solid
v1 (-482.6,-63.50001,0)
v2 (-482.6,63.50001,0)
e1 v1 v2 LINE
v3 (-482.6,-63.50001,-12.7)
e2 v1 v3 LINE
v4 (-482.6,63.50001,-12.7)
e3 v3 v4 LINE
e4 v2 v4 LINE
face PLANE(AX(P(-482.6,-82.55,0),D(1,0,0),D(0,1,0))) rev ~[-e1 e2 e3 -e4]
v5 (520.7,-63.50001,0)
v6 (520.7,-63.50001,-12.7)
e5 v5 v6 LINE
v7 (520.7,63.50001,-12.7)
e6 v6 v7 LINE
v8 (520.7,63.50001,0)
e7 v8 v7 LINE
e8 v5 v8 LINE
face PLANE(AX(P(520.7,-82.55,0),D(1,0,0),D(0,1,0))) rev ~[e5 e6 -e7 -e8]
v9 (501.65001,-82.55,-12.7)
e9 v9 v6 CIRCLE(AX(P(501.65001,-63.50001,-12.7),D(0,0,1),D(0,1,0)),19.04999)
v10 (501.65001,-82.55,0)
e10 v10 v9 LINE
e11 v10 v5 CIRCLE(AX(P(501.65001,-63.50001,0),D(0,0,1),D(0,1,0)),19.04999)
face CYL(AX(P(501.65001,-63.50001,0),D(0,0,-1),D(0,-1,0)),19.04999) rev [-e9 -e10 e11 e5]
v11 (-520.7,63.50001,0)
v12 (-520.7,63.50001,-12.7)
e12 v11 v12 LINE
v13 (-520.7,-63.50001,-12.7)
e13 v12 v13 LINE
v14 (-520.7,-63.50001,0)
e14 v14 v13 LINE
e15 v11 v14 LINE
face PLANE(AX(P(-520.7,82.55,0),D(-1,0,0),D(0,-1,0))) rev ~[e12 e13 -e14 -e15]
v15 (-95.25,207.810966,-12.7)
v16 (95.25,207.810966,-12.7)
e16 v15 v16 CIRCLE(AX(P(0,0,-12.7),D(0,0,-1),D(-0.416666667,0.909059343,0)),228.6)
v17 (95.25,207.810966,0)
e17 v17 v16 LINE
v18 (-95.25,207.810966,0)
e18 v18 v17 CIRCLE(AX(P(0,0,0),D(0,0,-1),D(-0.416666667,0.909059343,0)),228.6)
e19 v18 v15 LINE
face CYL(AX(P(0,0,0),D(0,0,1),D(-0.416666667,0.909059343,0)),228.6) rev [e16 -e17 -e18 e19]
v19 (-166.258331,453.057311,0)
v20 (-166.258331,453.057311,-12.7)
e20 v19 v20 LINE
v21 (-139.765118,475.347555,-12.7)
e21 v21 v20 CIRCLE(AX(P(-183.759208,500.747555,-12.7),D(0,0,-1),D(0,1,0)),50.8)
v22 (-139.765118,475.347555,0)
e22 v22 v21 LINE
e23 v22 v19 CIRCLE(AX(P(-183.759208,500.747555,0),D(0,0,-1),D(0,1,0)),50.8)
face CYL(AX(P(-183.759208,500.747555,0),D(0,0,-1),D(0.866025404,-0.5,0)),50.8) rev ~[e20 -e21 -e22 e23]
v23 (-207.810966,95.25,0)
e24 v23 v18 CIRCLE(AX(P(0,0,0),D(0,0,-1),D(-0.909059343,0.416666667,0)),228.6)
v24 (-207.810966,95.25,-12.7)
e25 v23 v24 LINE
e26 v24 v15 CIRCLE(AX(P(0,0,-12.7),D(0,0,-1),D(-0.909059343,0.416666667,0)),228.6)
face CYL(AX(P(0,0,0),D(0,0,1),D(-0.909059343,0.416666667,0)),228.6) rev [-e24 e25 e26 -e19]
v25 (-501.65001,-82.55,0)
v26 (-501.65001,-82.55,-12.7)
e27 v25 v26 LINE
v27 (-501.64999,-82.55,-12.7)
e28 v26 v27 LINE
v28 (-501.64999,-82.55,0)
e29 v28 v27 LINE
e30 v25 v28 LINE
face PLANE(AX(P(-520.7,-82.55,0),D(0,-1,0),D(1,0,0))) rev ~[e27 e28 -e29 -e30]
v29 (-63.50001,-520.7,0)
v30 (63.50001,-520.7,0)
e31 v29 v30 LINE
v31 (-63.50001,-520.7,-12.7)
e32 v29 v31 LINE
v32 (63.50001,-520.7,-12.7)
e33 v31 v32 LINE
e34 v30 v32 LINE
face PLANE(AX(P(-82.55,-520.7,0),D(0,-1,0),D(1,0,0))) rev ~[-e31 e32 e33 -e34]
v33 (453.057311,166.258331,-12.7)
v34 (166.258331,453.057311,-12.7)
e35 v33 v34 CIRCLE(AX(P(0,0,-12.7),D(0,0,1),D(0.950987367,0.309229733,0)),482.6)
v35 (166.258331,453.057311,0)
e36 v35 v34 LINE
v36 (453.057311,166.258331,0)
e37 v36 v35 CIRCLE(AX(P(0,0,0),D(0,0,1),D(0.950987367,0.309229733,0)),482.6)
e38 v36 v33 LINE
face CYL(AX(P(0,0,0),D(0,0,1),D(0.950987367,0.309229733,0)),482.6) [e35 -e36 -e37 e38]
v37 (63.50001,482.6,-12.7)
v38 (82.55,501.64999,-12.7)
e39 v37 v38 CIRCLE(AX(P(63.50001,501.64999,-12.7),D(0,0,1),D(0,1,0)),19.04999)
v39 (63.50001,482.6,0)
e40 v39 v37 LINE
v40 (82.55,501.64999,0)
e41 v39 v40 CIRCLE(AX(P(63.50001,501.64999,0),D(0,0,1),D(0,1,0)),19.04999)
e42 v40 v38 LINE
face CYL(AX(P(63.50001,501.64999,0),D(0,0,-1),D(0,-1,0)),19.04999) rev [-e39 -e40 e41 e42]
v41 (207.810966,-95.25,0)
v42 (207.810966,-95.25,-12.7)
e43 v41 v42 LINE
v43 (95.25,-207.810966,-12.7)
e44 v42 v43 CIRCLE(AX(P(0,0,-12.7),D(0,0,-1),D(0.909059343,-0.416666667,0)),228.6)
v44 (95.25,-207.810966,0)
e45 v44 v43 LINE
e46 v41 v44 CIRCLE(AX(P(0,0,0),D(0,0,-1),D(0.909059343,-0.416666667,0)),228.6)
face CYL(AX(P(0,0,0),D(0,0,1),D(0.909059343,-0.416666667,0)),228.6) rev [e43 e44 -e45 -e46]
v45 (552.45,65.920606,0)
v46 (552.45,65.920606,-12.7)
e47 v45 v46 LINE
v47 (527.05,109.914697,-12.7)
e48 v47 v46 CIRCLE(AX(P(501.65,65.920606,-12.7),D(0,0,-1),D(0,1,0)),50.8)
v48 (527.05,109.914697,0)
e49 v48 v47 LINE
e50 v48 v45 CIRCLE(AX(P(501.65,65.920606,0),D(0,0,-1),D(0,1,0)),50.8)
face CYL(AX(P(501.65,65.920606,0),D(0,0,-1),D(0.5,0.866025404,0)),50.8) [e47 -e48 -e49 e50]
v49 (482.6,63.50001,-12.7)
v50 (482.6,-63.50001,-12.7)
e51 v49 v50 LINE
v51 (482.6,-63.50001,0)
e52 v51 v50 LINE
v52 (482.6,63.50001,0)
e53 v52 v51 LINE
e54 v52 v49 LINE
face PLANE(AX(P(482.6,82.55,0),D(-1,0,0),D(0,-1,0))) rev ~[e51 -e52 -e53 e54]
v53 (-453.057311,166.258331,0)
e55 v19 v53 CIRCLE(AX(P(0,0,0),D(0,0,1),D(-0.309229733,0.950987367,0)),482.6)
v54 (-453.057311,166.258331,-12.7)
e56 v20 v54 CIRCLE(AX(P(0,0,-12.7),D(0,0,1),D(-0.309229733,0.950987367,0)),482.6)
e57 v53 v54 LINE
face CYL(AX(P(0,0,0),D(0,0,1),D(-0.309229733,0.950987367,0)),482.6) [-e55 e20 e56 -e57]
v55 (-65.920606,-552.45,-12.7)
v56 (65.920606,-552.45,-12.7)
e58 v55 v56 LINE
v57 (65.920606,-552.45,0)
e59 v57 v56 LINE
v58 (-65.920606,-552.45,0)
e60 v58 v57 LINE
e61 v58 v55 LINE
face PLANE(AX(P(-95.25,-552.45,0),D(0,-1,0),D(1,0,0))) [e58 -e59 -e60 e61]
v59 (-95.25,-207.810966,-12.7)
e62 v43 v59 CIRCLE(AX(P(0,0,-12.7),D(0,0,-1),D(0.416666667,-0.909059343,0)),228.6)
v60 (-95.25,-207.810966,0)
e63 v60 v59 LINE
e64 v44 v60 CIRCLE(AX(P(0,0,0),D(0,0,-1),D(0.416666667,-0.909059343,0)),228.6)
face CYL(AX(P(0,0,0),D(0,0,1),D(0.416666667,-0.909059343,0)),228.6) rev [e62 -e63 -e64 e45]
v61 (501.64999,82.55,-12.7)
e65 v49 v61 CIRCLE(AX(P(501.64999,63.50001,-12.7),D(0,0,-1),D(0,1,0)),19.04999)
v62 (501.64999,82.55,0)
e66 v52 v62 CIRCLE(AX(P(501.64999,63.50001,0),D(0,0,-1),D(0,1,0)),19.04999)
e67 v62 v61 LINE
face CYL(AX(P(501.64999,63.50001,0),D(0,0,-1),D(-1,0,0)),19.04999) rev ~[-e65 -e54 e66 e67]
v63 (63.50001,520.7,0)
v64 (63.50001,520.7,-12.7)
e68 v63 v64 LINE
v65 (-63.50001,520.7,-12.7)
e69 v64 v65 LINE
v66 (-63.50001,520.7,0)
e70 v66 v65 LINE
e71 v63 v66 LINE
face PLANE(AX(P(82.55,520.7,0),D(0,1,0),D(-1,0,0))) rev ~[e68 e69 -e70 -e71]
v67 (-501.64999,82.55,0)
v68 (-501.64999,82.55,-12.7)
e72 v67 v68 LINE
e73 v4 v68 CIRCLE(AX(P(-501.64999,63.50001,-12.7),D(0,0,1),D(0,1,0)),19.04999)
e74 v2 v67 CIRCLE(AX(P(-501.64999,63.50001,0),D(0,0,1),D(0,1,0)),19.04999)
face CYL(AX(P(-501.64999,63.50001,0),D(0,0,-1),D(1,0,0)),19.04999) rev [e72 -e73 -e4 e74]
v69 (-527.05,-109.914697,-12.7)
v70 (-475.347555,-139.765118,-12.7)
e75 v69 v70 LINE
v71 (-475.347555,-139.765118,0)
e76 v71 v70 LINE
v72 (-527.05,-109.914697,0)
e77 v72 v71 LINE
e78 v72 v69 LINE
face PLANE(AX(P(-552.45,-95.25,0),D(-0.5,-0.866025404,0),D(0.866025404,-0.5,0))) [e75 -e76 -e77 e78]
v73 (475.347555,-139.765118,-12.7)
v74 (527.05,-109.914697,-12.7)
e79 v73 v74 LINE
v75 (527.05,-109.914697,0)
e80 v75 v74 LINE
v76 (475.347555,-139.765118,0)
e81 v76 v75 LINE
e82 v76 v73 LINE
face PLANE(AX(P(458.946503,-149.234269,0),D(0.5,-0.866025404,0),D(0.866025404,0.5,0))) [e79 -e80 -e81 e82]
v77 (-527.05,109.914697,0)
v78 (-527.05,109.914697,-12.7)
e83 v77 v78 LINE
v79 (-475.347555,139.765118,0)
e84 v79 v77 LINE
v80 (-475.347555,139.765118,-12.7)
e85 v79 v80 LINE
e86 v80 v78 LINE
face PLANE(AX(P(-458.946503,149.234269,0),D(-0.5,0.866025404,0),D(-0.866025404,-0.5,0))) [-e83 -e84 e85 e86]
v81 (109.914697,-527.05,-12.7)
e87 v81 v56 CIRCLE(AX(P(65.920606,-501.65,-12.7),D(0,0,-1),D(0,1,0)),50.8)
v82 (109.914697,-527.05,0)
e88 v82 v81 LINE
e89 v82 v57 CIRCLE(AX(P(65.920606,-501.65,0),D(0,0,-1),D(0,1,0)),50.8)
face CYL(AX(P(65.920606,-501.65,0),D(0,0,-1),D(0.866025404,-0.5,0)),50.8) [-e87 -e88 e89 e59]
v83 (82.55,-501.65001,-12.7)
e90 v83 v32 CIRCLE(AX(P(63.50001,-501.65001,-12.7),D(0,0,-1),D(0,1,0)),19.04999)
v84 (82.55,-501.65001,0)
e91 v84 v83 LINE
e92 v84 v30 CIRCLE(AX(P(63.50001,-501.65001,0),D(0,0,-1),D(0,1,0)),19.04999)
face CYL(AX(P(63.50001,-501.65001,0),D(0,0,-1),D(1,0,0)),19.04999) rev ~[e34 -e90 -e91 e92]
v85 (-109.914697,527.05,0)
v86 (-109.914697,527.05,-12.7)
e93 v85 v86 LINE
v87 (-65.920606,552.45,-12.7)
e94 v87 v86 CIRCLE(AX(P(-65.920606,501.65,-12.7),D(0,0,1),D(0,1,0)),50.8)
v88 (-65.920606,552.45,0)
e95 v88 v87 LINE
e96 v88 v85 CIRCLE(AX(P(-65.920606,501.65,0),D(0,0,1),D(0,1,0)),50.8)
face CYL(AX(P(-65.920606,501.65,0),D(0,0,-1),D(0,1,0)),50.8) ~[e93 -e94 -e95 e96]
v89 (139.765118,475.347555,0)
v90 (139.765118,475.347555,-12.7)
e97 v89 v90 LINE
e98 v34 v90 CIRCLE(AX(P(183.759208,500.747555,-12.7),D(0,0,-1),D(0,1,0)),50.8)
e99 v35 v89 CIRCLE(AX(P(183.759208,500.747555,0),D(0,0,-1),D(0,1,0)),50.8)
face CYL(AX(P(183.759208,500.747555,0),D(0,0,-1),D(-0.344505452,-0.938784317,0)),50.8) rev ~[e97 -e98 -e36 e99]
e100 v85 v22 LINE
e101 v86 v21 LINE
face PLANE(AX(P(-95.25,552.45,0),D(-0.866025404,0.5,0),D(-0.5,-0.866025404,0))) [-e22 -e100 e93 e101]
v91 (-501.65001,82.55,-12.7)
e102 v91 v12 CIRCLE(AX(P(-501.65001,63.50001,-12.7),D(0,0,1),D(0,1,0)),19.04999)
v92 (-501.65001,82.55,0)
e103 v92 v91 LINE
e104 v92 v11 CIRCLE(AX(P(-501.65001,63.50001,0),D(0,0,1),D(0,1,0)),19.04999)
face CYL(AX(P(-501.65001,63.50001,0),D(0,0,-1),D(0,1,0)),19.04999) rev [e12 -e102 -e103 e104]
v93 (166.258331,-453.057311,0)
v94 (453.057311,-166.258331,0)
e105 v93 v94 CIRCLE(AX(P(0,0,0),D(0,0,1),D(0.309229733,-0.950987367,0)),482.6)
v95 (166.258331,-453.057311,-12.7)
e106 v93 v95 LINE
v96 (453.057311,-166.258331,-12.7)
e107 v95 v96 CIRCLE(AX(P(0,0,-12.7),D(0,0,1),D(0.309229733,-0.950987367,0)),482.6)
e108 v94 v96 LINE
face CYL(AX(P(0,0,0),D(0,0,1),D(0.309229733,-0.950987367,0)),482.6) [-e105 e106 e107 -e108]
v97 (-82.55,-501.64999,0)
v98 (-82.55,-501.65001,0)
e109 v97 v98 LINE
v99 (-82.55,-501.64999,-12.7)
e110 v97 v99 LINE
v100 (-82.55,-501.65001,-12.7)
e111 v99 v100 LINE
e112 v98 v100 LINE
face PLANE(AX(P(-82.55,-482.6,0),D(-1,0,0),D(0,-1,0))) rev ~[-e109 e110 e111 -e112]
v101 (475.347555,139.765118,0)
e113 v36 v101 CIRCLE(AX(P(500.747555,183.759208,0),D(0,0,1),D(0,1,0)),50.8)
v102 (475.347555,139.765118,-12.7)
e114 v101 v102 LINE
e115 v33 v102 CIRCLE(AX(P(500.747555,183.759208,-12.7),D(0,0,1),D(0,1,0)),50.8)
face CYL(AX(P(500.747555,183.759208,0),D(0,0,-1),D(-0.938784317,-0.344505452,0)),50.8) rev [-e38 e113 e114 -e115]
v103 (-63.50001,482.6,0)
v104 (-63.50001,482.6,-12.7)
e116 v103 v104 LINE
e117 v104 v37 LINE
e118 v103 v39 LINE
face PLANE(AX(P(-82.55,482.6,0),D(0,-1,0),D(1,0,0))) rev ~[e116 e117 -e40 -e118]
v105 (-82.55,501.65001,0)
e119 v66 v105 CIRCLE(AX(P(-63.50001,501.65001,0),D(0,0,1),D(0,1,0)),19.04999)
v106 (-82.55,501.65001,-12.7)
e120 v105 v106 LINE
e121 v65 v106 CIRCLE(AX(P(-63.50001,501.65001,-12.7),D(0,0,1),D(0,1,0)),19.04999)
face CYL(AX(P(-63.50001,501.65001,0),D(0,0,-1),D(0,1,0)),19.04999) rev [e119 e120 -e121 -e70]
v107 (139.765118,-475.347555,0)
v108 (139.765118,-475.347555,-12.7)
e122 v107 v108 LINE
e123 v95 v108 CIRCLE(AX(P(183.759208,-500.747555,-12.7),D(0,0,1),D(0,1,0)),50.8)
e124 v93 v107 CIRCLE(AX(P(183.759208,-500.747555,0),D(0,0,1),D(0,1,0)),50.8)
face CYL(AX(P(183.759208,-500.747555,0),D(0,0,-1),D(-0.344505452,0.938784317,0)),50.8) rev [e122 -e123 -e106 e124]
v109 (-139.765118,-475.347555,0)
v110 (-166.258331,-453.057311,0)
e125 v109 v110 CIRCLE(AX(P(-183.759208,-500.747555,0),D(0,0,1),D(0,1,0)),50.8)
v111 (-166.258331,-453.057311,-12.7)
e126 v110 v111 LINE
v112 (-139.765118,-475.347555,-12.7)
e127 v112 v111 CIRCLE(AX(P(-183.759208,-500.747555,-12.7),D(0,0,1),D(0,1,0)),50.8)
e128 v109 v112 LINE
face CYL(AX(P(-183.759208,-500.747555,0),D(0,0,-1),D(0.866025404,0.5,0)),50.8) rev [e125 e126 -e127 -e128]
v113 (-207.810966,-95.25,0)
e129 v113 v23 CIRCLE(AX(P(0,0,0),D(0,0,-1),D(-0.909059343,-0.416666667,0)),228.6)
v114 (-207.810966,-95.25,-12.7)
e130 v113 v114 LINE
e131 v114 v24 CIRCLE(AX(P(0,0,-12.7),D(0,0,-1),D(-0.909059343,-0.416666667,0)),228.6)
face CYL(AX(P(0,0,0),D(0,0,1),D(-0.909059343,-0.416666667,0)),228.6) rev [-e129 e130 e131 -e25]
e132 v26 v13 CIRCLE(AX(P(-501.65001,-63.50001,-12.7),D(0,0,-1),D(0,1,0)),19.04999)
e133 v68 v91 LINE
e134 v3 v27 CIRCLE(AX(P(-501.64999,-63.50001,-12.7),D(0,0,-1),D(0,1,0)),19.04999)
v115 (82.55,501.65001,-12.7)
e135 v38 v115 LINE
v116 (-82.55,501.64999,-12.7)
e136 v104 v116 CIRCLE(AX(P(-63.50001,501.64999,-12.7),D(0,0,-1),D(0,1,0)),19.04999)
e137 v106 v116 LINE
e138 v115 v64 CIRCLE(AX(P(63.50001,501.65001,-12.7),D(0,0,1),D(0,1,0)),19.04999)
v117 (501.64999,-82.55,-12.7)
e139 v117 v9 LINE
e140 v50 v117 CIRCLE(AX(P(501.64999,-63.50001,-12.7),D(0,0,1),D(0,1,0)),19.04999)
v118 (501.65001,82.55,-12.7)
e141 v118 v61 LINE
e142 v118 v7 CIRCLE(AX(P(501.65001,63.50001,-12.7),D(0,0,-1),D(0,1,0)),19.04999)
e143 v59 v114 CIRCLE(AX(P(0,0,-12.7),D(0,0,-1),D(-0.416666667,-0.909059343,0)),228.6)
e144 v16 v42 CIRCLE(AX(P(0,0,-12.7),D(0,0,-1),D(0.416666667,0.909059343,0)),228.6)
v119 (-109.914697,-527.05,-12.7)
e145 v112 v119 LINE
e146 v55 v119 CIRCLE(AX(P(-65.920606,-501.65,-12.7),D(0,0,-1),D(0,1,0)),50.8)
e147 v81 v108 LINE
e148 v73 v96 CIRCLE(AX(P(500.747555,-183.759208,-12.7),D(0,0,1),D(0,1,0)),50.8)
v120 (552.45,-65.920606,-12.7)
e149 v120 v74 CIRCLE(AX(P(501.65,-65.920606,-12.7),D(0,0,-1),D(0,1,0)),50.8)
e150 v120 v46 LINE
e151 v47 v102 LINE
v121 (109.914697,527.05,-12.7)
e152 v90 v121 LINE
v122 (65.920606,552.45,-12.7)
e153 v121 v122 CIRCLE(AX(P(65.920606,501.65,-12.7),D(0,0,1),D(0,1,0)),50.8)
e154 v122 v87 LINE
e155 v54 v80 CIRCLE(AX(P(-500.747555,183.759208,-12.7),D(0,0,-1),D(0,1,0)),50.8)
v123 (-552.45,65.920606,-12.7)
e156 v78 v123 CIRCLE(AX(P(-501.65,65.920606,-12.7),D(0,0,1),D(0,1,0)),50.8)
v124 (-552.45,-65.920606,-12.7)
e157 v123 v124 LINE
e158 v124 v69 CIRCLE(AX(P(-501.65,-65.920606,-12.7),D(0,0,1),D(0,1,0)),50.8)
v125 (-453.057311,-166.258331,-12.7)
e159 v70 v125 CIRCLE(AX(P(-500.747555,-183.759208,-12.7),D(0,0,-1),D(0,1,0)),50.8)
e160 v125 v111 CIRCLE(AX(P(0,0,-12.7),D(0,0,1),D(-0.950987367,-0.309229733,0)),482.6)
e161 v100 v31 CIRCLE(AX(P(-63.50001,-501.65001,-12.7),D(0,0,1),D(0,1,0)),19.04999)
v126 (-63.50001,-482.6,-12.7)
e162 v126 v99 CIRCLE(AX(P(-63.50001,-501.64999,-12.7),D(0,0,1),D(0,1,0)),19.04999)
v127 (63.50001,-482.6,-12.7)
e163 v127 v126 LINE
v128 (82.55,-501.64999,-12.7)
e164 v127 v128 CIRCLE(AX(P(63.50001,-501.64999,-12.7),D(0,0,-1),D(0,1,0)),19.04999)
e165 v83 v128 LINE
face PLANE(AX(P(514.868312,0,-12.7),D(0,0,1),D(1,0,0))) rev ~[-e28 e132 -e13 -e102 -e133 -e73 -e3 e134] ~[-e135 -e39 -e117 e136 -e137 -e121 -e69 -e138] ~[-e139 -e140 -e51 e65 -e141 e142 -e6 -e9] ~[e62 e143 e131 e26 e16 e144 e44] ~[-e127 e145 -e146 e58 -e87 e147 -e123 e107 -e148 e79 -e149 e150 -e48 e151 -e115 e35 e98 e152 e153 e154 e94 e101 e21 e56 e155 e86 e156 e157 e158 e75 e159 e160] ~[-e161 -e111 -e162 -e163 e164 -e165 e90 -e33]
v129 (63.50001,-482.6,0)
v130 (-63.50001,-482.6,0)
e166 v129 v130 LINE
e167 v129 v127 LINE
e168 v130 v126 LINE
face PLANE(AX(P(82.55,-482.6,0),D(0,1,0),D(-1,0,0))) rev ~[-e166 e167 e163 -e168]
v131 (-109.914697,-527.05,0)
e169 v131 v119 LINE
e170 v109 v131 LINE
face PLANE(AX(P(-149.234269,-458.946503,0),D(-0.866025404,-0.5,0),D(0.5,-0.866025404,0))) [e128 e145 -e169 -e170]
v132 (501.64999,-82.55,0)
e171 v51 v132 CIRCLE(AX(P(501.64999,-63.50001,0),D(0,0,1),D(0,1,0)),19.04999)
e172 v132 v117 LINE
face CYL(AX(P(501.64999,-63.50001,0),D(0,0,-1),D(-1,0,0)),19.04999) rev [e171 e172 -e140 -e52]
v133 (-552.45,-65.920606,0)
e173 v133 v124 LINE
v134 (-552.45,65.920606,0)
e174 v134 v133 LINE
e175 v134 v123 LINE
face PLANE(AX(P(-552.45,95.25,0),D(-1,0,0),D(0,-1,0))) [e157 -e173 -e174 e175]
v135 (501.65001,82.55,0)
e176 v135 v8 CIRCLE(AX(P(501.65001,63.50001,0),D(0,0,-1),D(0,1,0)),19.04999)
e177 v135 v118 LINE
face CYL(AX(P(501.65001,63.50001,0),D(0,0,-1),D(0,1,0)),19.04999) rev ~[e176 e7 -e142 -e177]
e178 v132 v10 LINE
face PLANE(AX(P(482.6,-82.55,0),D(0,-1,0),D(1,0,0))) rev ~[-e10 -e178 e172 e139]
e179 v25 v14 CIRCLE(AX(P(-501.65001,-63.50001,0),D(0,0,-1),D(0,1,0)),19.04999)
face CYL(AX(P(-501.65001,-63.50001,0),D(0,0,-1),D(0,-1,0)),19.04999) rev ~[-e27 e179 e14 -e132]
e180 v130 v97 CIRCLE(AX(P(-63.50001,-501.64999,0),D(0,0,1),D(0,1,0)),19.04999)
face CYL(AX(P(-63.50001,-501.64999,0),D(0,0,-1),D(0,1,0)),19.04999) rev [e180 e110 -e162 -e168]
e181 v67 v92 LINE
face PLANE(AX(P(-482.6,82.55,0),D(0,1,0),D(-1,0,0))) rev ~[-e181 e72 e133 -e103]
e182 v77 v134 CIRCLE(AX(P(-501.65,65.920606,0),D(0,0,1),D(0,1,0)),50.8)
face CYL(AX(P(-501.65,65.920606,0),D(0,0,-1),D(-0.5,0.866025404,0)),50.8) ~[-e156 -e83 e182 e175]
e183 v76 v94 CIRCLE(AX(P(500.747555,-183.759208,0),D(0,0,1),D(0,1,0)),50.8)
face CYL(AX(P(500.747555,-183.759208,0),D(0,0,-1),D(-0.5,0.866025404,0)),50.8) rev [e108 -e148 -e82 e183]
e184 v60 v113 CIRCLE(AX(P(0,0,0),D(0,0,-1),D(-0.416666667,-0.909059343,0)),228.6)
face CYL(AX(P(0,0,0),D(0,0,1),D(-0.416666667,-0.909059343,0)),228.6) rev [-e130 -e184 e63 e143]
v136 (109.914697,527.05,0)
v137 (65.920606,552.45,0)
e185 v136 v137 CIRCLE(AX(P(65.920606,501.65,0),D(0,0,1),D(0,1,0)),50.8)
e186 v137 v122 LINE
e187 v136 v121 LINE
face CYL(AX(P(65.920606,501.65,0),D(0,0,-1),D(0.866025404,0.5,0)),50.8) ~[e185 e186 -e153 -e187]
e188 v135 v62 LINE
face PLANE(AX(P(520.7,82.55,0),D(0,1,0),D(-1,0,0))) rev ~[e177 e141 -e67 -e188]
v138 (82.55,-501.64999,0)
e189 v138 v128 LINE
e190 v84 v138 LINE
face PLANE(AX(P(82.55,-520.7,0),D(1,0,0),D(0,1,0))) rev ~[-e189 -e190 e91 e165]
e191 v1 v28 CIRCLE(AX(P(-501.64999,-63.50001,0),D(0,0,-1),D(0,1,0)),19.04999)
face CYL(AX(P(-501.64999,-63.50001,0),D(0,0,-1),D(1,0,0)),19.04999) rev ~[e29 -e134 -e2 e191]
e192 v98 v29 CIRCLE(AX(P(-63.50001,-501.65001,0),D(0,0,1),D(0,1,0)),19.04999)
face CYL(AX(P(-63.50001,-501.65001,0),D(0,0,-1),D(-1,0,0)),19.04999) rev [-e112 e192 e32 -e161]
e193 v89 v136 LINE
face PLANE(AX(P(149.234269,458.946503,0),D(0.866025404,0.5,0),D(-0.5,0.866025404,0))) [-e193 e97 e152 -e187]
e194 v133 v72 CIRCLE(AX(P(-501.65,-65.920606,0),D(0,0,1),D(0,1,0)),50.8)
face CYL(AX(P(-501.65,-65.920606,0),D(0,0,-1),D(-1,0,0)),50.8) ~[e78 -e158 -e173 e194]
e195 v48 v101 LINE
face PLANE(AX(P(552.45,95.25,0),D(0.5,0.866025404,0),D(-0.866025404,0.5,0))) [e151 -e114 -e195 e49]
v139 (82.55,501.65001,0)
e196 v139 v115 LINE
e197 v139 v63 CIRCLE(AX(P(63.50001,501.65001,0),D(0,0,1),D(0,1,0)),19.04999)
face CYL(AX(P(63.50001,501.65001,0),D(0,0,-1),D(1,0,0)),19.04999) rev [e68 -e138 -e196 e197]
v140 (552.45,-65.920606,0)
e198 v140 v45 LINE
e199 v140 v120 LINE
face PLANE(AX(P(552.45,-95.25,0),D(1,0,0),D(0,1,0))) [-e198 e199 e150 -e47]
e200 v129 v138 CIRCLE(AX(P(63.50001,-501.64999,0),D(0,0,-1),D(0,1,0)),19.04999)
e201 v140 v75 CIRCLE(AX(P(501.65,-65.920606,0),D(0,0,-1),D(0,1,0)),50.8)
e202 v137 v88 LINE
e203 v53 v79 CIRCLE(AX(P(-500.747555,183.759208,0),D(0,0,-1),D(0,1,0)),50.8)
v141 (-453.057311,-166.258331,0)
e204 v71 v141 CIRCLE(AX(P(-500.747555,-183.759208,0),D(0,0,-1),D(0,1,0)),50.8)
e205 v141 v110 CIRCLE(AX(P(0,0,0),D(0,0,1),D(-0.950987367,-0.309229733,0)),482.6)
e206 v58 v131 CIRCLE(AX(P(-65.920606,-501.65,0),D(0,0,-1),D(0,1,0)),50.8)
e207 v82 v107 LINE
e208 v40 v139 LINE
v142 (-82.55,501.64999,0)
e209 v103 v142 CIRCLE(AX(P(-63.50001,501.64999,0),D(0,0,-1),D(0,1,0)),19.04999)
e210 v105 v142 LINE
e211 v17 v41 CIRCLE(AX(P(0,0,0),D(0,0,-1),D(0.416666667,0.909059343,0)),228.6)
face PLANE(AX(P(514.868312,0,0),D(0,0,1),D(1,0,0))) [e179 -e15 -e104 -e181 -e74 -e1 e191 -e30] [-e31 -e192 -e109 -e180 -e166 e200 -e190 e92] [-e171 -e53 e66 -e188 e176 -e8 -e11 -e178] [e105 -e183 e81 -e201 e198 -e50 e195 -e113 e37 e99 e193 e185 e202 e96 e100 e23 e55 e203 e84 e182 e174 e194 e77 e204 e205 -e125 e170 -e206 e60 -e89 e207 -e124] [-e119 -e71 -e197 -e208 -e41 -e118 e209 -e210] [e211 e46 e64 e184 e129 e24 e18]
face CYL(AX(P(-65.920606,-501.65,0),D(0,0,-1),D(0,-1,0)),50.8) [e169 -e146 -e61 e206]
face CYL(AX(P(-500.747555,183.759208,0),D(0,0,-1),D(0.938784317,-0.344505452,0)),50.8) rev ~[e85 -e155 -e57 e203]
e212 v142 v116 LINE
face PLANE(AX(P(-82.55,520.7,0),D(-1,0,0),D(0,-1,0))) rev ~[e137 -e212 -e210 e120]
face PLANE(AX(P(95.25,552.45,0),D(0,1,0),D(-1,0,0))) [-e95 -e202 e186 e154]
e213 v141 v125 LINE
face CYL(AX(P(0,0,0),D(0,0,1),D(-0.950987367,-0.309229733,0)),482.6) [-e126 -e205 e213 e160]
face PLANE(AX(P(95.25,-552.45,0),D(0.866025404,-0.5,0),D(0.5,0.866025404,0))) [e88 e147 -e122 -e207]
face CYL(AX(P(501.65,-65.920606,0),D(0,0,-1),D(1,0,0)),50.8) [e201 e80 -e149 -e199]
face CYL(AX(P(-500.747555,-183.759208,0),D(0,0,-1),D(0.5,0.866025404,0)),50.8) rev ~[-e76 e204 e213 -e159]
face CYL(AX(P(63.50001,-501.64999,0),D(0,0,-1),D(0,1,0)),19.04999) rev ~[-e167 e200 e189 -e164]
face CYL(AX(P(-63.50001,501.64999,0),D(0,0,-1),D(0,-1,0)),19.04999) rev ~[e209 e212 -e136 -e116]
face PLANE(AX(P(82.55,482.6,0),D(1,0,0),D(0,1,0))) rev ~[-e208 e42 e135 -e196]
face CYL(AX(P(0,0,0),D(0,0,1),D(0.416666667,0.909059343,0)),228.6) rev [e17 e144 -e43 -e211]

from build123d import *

# Parameters (mm, degrees)
F1_DEPTH        = 12.7
F2_DEPTH        = 25.4
F2_COPIES_COUNT = 4
F3_R            = 19.04999
F5_R            = 50.8


# Not quite as in the source:
# - a fillet or chamfer is up to 0.001 mm smaller than in the source, because OpenCascade refuses the exact size
# - a feature of the source that left no trace in its solid (it failed there, or was rolled back) is left out
# - a pattern or mirror of a feature is missing from the dataset's text; its kind, count and spacing are read off the source's solid


with BuildPart() as f1:
    # F0 (on Top) → F1 (new body)
    with BuildSketch(Plane.XY):
        with BuildLine():
            Line((552.45, 95.25), (473.1069620075, 95.25))
            ThreePointArc((473.1069620075, 95.25), (480.2208761939, 47.8609451179), (482.6, 0))
            ThreePointArc((482.6, 0), (480.2208761939, -47.8609451179), (473.1069620075, -95.25))
            Line((473.1069620075, -95.25), (552.45, -95.25))
            Line((552.45, -95.25), (552.45, 95.25))
        make_face()
        with BuildLine():
            Line((-207.8109657838, 95.25), (-473.1069620075, 95.25))
            ThreePointArc((-473.1069620075, 95.25), (-480.2208762804, 47.8609442495), (-482.6, -1.7456e-06))
            ThreePointArc((-482.6, -1.7456e-06), (-480.2208761073, -47.8609459864), (-473.1069620075, -95.25))
            Line((-473.1069620075, -95.25), (-207.8109657838, -95.25))
            ThreePointArc((-207.8109657838, -95.25), (-228.6, 0), (-207.8109657838, 95.25))
        make_face()
        with BuildLine():
            Line((473.1069620075, 95.25), (207.8109657838, 95.25))
            ThreePointArc((207.8109657838, 95.25), (223.3422785527, 48.7461445748), (228.6, 0))
            ThreePointArc((228.6, 0), (223.3422785527, -48.7461445748), (207.8109657838, -95.25))
            Line((207.8109657838, -95.25), (473.1069620075, -95.25))
            ThreePointArc((473.1069620075, -95.25), (480.2208761939, -47.8609451179), (482.6, 0))
            ThreePointArc((482.6, 0), (480.2208761939, 47.8609451179), (473.1069620075, 95.25))
        make_face()
        with BuildLine():
            ThreePointArc((-458.9465033909, 149.2342689375), (-466.8077665522, 122.4470052167), (-473.1069620075, 95.25))
            Line((-473.1069620075, 95.25), (-207.8109657838, 95.25))
            ThreePointArc((-207.8109657838, 95.25), (-161.6446101792, 161.6446101792), (-95.25, 207.8109657838))
            Line((-95.25, 207.8109657838), (-95.25, 473.1069620075))
            ThreePointArc((-95.25, 473.1069620075), (-122.4470052167, 466.8077665522), (-149.2342689375, 458.9465033909))
            ThreePointArc((-149.2342689375, 458.9465033909), (-341.2497326006, 341.2497326006), (-458.9465033909, 149.2342689375))
        make_face()
        with BuildLine():
            Line((-95.25, 473.1069620075), (-95.25, 207.8109657838))
            ThreePointArc((-95.25, 207.8109657838), (0, 228.6), (95.25, 207.8109657838))
            Line((95.25, 207.8109657838), (95.25, 473.1069620075))
            ThreePointArc((95.25, 473.1069620075), (0, 482.6), (-95.25, 473.1069620075))
        make_face()
        with BuildLine():
            Line((95.25, 473.1069620075), (95.25, 207.8109657838))
            ThreePointArc((95.25, 207.8109657838), (161.6446101792, 161.6446101792), (207.8109657838, 95.25))
            Line((207.8109657838, 95.25), (473.1069620075, 95.25))
            ThreePointArc((473.1069620075, 95.25), (466.8077665522, 122.4470052167), (458.9465033909, 149.2342689375))
            ThreePointArc((458.9465033909, 149.2342689375), (341.2497326006, 341.2497326006), (149.2342689375, 458.9465033909))
            ThreePointArc((149.2342689375, 458.9465033909), (122.4470052167, 466.8077665522), (95.25, 473.1069620075))
        make_face()
        with BuildLine():
            Line((-95.25, 552.45), (-95.25, 473.1069620075))
            ThreePointArc((-95.25, 473.1069620075), (0, 482.6), (95.25, 473.1069620075))
            Line((95.25, 473.1069620075), (95.25, 552.45))
            Line((95.25, 552.45), (-95.25, 552.45))
        make_face()
        with BuildLine():
            ThreePointArc((207.8109657838, -95.25), (161.6446101792, -161.6446101792), (95.25, -207.8109657838))
            Line((95.25, -207.8109657838), (95.25, -473.1069620075))
            ThreePointArc((95.25, -473.1069620075), (122.4470052167, -466.8077665522), (149.2342689375, -458.9465033909))
            ThreePointArc((149.2342689375, -458.9465033909), (341.2497326006, -341.2497326006), (458.9465033909, -149.2342689375))
            ThreePointArc((458.9465033909, -149.2342689375), (466.8077665522, -122.4470052167), (473.1069620075, -95.25))
            Line((473.1069620075, -95.25), (207.8109657838, -95.25))
        make_face()
        with BuildLine():
            ThreePointArc((95.25, -207.8109657838), (0, -228.6), (-95.25, -207.8109657838))
            Line((-95.25, -207.8109657838), (-95.25, -473.1069620075))
            ThreePointArc((-95.25, -473.1069620075), (0, -482.6), (95.25, -473.1069620075))
            Line((95.25, -473.1069620075), (95.25, -207.8109657838))
        make_face()
        with BuildLine():
            Line((-207.8109657838, -95.25), (-473.1069620075, -95.25))
            ThreePointArc((-473.1069620075, -95.25), (-466.8077665522, -122.4470052167), (-458.9465033909, -149.2342689375))
            ThreePointArc((-458.9465033909, -149.2342689375), (-341.2497326006, -341.2497326006), (-149.2342689375, -458.9465033909))
            ThreePointArc((-149.2342689375, -458.9465033909), (-122.4470052167, -466.8077665522), (-95.25, -473.1069620075))
            Line((-95.25, -473.1069620075), (-95.25, -207.8109657838))
            ThreePointArc((-95.25, -207.8109657838), (-161.6446101792, -161.6446101792), (-207.8109657838, -95.25))
        make_face()
        with BuildLine():
            ThreePointArc((95.25, -473.1069620075), (0, -482.6), (-95.25, -473.1069620075))
            Line((-95.25, -473.1069620075), (-95.25, -552.45))
            Line((-95.25, -552.45), (95.25, -552.45))
            Line((95.25, -552.45), (95.25, -473.1069620075))
        make_face()
        with BuildLine():
            Line((-473.1069620075, 95.25), (-552.45, 95.25))
            Line((-552.45, 95.25), (-552.45, -95.25))
            Line((-552.45, -95.25), (-473.1069620075, -95.25))
            ThreePointArc((-473.1069620075, -95.25), (-480.2208761073, -47.8609459864), (-482.6, -1.7456e-06))
            ThreePointArc((-482.6, -1.7456e-06), (-480.2208762804, 47.8609442495), (-473.1069620075, 95.25))
        make_face()
        Polygon((-482.6, 82.55), (-482.6, -1.7456e-06), (-482.6, -82.55), (-520.7, -82.55), (-520.7, 82.55), align=None, mode=Mode.SUBTRACT)
        Polygon((-482.6, -82.55), (-482.6, -1.7456e-06), (-482.6, 82.55), (-520.7, 82.55), (-520.7, -82.55), align=None)
        with BuildLine():
            Line((-458.9465033909, 149.2342689375), (-552.45, 95.25))
            Line((-552.45, 95.25), (-473.1069620075, 95.25))
            ThreePointArc((-473.1069620075, 95.25), (-466.8077665522, 122.4470052167), (-458.9465033909, 149.2342689375))
        make_face()
        with BuildLine():
            Line((-473.1069620075, -95.25), (-552.45, -95.25))
            Line((-552.45, -95.25), (-458.9465033909, -149.2342689375))
            ThreePointArc((-458.9465033909, -149.2342689375), (-466.8077665522, -122.4470052167), (-473.1069620075, -95.25))
        make_face()
        with BuildLine():
            Line((-95.25, 552.45), (-149.2342689375, 458.9465033909))
            ThreePointArc((-149.2342689375, 458.9465033909), (-122.4470052167, 466.8077665522), (-95.25, 473.1069620075))
            Line((-95.25, 473.1069620075), (-95.25, 552.45))
        make_face()
        with BuildLine():
            Line((95.25, 552.45), (95.25, 473.1069620075))
            ThreePointArc((95.25, 473.1069620075), (122.4470052167, 466.8077665522), (149.2342689375, 458.9465033909))
            Line((149.2342689375, 458.9465033909), (95.25, 552.45))
        make_face()
        with BuildLine():
            ThreePointArc((458.9465033909, 149.2342689375), (466.8077665522, 122.4470052167), (473.1069620075, 95.25))
            Line((473.1069620075, 95.25), (552.45, 95.25))
            Line((552.45, 95.25), (458.9465033909, 149.2342689375))
        make_face()
        with BuildLine():
            Line((552.45, -95.25), (473.1069620075, -95.25))
            ThreePointArc((473.1069620075, -95.25), (466.8077665522, -122.4470052167), (458.9465033909, -149.2342689375))
            Line((458.9465033909, -149.2342689375), (552.45, -95.25))
        make_face()
        with BuildLine():
            ThreePointArc((149.2342689375, -458.9465033909), (122.4470052167, -466.8077665522), (95.25, -473.1069620075))
            Line((95.25, -473.1069620075), (95.25, -552.45))
            Line((95.25, -552.45), (149.2342689375, -458.9465033909))
        make_face()
        with BuildLine():
            ThreePointArc((-95.25, -473.1069620075), (-122.4470052167, -466.8077665522), (-149.2342689375, -458.9465033909))
            Line((-149.2342689375, -458.9465033909), (-95.25, -552.45))
            Line((-95.25, -552.45), (-95.25, -473.1069620075))
        make_face()
    extrude(amount=-F1_DEPTH)

    # F0 (on Top) → F2 (cut)
    with BuildSketch(Plane.XY):
        Polygon((-482.6, -82.55), (-482.6, -1.7456e-06), (-482.6, 82.55), (-520.7, 82.55), (-520.7, -82.55), align=None)
    f2 = extrude(amount=-F2_DEPTH, mode=Mode.SUBTRACT)

    # F2_copies: F2 ×4 about axis
    f2_copies_axis = Axis((0, 0, 0), (0, 0, 1))
    for i in range(1, F2_COPIES_COUNT):
        add(f2.rotate(f2_copies_axis, i * 360 / F2_COPIES_COUNT), mode=Mode.SUBTRACT)

    # F3 (radius 19.05 in the source; OpenCascade refuses exactly that, so slightly less here)
    f3_edges = [f1.edges().sort_by_distance(p)[0] for p in [
        (-520.7, -82.55, -6.35),
        (-482.6, -82.55, -6.35),
        (-520.7, 82.55, -6.35),
        (-482.6, 82.55, -6.35),
        (-82.55, -520.7, -6.35),
        (-82.55, -482.6, -6.35),
        (82.55, -482.6, -6.35),
        (82.55, -520.7, -6.35),
        (520.7, -82.55, -6.35),
        (482.6, -82.55, -6.35),
        (482.6, 82.55, -6.35),
        (520.7, 82.55, -6.35),
        (82.55, 520.7, -6.35),
        (82.55, 482.6, -6.35),
        (-82.55, 520.7, -6.35),
        (-82.55, 482.6, -6.35),
    ]]
    fillet(f3_edges, radius=F3_R)

    # F5
    f5_edges = [f1.edges().sort_by_distance(p)[0] for p in [
        (-149.234269, -458.946503, -6.35),
        (-95.25, -552.45, -6.35),
        (95.25, -552.45, -6.35),
        (149.234269, -458.946503, -6.35),
        (458.946503, -149.234269, -6.35),
        (552.45, -95.25, -6.35),
        (552.45, 95.25, -6.35),
        (458.946503, 149.234269, -6.35),
        (149.234269, 458.946503, -6.35),
        (95.25, 552.45, -6.35),
        (-95.25, 552.45, -6.35),
        (-149.234269, 458.946503, -6.35),
        (-458.946503, 149.234269, -6.35),
        (-552.45, 95.25, -6.35),
        (-552.45, -95.25, -6.35),
        (-458.946503, -149.234269, -6.35),
    ]]
    fillet(f5_edges, radius=F5_R)


solid = f1.part
